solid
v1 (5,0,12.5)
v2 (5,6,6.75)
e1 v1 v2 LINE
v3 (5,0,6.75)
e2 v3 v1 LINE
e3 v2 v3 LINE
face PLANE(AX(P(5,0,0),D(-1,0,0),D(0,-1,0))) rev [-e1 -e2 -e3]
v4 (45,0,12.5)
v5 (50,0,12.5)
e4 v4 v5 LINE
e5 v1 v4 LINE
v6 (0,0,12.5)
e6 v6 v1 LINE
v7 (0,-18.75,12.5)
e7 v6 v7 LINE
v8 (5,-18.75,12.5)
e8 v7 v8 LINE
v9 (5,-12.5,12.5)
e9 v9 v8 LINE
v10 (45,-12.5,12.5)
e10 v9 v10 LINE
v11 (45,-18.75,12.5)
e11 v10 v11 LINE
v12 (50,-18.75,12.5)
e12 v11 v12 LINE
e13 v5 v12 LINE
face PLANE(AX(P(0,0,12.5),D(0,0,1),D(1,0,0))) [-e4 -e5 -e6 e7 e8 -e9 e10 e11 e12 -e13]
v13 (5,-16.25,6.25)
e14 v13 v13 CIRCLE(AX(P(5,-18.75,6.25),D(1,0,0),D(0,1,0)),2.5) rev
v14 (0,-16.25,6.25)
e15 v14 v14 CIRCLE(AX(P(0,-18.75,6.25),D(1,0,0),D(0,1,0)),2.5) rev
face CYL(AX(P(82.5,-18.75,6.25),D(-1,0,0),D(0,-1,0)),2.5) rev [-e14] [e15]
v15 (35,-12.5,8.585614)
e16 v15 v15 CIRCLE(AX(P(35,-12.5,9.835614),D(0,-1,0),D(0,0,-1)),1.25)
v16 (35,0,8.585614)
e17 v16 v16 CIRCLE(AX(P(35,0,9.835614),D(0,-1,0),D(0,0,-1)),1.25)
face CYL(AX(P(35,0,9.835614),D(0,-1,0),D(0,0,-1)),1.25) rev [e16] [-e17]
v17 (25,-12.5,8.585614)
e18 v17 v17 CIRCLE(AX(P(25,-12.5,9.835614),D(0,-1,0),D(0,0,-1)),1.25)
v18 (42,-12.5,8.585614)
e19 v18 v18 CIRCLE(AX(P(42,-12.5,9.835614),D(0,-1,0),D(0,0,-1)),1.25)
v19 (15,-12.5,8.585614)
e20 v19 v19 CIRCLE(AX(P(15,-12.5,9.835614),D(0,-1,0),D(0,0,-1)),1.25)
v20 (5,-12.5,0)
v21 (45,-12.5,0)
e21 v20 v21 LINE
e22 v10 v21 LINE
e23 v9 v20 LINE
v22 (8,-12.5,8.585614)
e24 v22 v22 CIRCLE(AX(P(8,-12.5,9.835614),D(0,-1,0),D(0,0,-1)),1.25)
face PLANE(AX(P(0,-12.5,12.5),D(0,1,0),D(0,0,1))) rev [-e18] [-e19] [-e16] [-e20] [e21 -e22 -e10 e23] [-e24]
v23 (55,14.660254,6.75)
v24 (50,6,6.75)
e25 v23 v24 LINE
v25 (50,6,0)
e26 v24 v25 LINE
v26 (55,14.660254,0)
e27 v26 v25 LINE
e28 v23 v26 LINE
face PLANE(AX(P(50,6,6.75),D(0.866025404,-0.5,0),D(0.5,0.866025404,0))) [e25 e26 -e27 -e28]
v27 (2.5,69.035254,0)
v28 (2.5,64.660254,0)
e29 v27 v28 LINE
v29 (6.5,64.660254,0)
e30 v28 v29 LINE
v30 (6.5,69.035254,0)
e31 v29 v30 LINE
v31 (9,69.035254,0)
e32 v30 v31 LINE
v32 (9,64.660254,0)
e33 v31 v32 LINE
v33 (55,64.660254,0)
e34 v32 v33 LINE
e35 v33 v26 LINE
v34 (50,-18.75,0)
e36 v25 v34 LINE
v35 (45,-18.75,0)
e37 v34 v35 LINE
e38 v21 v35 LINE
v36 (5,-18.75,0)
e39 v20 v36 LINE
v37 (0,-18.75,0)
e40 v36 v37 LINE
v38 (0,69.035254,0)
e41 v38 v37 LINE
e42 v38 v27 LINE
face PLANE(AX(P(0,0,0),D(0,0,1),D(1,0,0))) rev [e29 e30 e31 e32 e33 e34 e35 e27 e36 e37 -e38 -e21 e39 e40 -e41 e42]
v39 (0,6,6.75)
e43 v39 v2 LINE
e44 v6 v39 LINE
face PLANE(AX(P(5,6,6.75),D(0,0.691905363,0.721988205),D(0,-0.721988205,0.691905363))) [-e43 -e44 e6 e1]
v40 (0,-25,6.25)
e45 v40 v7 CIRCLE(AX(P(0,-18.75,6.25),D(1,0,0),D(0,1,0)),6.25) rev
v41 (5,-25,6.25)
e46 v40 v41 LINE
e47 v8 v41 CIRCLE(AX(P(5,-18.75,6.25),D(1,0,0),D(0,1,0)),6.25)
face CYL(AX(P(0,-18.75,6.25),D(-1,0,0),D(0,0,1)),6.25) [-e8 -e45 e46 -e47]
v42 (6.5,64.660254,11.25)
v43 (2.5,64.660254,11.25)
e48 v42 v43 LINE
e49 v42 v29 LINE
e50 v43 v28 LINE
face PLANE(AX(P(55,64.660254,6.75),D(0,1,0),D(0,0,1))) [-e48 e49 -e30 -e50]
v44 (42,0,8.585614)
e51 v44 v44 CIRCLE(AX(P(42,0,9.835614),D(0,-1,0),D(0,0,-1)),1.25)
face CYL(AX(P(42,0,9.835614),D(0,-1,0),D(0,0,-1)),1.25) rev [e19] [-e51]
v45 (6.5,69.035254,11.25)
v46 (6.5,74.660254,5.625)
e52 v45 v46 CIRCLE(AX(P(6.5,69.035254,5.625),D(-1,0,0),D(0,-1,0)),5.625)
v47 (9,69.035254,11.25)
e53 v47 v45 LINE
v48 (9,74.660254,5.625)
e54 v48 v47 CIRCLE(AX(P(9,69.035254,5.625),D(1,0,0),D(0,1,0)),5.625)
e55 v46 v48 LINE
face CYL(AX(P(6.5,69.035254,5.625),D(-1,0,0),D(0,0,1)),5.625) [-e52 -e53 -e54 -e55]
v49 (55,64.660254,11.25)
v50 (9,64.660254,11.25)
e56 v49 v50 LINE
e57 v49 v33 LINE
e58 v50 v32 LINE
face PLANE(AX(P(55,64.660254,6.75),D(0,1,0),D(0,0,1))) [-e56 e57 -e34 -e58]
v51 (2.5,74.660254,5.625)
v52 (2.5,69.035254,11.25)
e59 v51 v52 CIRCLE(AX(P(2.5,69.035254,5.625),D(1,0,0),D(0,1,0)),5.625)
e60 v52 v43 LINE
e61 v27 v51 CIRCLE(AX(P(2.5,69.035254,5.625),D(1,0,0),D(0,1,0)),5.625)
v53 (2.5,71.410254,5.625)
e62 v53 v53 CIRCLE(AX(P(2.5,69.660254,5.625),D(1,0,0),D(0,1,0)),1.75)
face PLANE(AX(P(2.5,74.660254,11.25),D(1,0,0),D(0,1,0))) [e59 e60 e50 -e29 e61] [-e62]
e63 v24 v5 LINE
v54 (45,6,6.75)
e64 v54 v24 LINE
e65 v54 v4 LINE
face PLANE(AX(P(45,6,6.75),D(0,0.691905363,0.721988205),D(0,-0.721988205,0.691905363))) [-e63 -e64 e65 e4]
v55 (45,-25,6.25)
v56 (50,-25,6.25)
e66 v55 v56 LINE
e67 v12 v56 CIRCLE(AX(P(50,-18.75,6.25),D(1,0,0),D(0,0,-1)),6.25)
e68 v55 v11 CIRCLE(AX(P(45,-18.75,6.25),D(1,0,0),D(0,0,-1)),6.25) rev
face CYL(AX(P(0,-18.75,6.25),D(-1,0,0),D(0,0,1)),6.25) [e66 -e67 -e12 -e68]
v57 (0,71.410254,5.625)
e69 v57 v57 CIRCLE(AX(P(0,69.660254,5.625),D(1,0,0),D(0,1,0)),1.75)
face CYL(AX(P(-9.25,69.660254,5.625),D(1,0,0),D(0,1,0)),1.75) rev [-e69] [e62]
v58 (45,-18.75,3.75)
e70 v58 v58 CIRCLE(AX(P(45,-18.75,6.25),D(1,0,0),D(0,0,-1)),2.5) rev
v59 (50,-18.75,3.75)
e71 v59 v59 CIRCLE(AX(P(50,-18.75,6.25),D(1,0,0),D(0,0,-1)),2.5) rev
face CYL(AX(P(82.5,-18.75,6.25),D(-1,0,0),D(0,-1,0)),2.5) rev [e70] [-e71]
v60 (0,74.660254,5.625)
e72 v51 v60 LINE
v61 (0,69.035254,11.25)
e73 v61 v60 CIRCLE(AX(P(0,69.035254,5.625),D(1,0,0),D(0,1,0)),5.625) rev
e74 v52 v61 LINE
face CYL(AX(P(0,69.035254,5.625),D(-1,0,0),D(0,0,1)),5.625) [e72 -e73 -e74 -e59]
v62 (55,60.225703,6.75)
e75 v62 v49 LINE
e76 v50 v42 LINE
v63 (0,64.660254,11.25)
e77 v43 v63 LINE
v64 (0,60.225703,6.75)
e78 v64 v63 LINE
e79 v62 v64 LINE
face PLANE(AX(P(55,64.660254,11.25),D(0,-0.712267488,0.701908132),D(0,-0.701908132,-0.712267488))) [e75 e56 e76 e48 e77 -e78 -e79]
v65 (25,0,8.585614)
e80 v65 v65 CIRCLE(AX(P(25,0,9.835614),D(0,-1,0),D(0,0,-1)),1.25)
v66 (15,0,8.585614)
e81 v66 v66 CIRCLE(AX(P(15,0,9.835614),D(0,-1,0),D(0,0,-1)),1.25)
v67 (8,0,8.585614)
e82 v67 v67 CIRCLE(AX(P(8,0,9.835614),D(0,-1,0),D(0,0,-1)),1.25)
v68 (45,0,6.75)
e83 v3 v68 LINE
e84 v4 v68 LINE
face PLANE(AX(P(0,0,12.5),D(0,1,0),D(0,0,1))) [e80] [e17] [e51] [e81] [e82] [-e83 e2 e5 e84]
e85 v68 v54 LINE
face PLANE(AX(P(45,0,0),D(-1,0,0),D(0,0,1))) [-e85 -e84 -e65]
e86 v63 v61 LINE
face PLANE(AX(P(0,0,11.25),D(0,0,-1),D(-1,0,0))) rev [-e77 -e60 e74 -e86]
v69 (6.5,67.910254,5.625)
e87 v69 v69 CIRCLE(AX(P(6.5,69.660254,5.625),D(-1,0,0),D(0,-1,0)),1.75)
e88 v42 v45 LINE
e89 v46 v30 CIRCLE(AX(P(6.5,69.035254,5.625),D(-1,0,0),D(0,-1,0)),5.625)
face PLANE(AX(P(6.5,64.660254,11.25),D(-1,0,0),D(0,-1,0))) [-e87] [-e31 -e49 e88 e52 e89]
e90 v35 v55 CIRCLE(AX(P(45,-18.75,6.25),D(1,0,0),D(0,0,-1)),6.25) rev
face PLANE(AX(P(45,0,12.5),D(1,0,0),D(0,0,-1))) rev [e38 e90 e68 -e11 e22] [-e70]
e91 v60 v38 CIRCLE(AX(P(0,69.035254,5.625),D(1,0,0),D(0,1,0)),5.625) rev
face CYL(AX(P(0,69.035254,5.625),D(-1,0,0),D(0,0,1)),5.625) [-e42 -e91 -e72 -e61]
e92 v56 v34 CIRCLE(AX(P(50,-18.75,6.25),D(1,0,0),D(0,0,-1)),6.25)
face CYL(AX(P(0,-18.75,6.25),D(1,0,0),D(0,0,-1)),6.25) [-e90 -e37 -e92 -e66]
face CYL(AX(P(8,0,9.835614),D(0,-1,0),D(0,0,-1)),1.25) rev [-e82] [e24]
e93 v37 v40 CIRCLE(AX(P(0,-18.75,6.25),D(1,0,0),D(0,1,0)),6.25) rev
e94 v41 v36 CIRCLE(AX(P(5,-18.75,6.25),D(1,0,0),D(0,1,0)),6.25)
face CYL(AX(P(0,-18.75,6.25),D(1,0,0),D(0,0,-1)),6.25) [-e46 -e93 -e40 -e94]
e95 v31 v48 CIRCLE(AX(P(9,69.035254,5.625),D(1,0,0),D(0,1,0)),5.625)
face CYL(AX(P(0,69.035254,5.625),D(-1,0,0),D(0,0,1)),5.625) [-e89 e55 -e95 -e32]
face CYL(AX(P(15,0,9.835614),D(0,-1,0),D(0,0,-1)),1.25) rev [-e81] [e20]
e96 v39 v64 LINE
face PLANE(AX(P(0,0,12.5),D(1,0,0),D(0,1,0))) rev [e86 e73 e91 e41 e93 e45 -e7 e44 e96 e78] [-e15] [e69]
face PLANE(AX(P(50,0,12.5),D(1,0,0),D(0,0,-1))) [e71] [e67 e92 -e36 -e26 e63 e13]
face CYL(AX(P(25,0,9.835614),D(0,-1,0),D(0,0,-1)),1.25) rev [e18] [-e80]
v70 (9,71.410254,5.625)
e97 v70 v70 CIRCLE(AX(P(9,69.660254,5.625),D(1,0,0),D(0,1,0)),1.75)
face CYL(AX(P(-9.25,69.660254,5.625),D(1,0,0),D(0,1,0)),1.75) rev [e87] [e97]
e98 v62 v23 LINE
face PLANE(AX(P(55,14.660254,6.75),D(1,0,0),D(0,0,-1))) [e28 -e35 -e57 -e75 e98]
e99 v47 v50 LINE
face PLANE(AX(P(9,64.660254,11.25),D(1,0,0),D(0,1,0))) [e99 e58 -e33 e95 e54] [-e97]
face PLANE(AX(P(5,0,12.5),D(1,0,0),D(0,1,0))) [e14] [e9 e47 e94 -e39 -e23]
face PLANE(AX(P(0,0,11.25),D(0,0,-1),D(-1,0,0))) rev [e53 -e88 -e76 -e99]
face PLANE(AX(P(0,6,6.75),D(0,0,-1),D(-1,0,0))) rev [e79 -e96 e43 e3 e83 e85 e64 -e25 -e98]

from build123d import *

# Parameters (mm, degrees)
SKETCH1_W               = 50
SKETCH1_H               = 12.5
SKETCH1_W_2             = 5
BOSS_EXTRUDE1_DEPTH     = 12.5
FILLET1_R               = 6.25
CUT_EXTRUDE1_DEPTH      = 77.5
CUT_EXTRUDE1_DEPTH_BACK = 24.5
SKETCH2_R               = 2.5
SKETCH4_R               = 1.25
CUT_EXTRUDE2_DEPTH      = 12.5
BOSS_EXTRUDE4_DEPTH     = 6
BOSS_EXTRUDE5_DEPTH     = 5
BOSS_EXTRUDE6_DEPTH     = 5
BOSS_EXTRUDE8_DEPTH     = 6.75
BOSS_EXTRUDE10_DEPTH    = 55
SKETCH12_W              = 2.5
SKETCH12_H              = 10
BOSS_EXTRUDE11_DEPTH    = 11.25
SKETCH14_W              = 2.5
SKETCH14_H              = 10
BOSS_EXTRUDE12_DEPTH    = 11.25
FILLET2_R               = 5.625
SKETCH16_R              = 1.75
CUT_EXTRUDE3_DEPTH      = 18.25


with BuildPart() as part:
    # Sketch1 → Boss-Extrude1 (new body)
    with BuildSketch(Plane.XY):
        with Locations((25, -6.25)):
            Rectangle(SKETCH1_W, SKETCH1_H)
        with Locations((2.5, -18.75)):
            Rectangle(SKETCH1_W_2, SKETCH1_H)
        with Locations((47.5, -18.75)):
            Rectangle(SKETCH1_W_2, SKETCH1_H)
    extrude(amount=BOSS_EXTRUDE1_DEPTH)

    # Fillet1
    fillet1_edges = [part.edges().sort_by_distance(p)[0] for p in [
        (2.5, -25, 12.5),
        (2.5, -25, 0),
        (47.5, -25, 12.5),
        (47.5, -25, 0),
    ]]
    fillet(fillet1_edges, radius=FILLET1_R - 0.0001)  # a hair under: the kernel refuses the full size

    # Sketch2 → Cut-Extrude1 (cut, two sides: drawn at the far end of the back side and taken through both)
    with BuildSketch(Plane(origin=(5, 0, 0), x_dir=(0, 0, -1), z_dir=(1, 0, 0)).offset(-CUT_EXTRUDE1_DEPTH_BACK)):
        with Locations((-6.25, -18.75)):
            Circle(SKETCH2_R)
    extrude(amount=CUT_EXTRUDE1_DEPTH + CUT_EXTRUDE1_DEPTH_BACK, mode=Mode.SUBTRACT)

    # Sketch4 → Cut-Extrude2 (cut)
    with BuildSketch(Plane(origin=(0, -12.5, 0), x_dir=(-1, 0, 0), z_dir=(0, -1, 0))):
        with Locations(Location((-8, -9.835613506, 0), (0, 0, 90))):
            Circle(SKETCH4_R)
        with Locations(Location((-15, -9.835613506, 0), (0, 0, 90))):
            Circle(SKETCH4_R)
        with Locations(Location((-25, -9.835613506, 0), (0, 0, 90))):
            Circle(SKETCH4_R)
        with Locations(Location((-35, -9.835613506, 0), (0, 0, 90))):
            Circle(SKETCH4_R)
        with Locations(Location((-42, -9.835613506, 0), (0, 0, 90))):
            Circle(SKETCH4_R)
    extrude(amount=-CUT_EXTRUDE2_DEPTH, mode=Mode.SUBTRACT)

    # Sketch5 → Boss-Extrude4 (add)
    with BuildSketch(Plane(origin=(0, 0, 0), x_dir=(1, 0, 0), z_dir=(0, 1, 0))):
        Polygon((50, 0), (0, 0), (0, -6.75), (5.75, -6.75), (44.25, -6.75), (50, -6.75), align=None)
    extrude(amount=BOSS_EXTRUDE4_DEPTH)

    # Sketch6 → Boss-Extrude5 (add)
    with BuildSketch(Plane.ZY):
        Polygon((6.75, 6), (12.5, 0), (6.75, 0), align=None)
    extrude(amount=-BOSS_EXTRUDE5_DEPTH)

    # Sketch7 → Boss-Extrude6 (add)
    with BuildSketch(Plane(origin=(50, 0, 0), x_dir=(0, 0, -1), z_dir=(1, 0, 0))):
        Polygon((-6.75, 6), (-12.5, 0), (-6.75, 0), align=None)
    extrude(amount=-BOSS_EXTRUDE6_DEPTH)

    # Sketch8 → Boss-Extrude8 (add)
    with BuildSketch(Plane(origin=(0, 0, 0), x_dir=(-1, 0, 0), z_dir=(0, 0, -1))):
        Polygon((-50, 6), (-55, 14.660254038), (-55, 64.660254038), (0, 64.660254038), (0, 6), align=None)
    extrude(amount=-BOSS_EXTRUDE8_DEPTH)

    # Sketch10 → Boss-Extrude10 (add)
    with BuildSketch(Plane.ZY):
        Polygon((6.75, 64.660254038), (11.25, 64.660254038), (6.75, 60.225702909), align=None)
    extrude(amount=-BOSS_EXTRUDE10_DEPTH)

    # Sketch12 → Boss-Extrude11 (add)
    with BuildSketch(Plane(origin=(0, 0, 0), x_dir=(-1, 0, 0), z_dir=(0, 0, -1))):
        with Locations((-1.25, 69.660254038)):
            Rectangle(SKETCH12_W, SKETCH12_H)
    extrude(amount=-BOSS_EXTRUDE11_DEPTH)

    # Sketch14 → Boss-Extrude12 (add)
    with BuildSketch(Plane(origin=(0, 0, 0), x_dir=(-1, 0, 0), z_dir=(0, 0, -1))):
        with Locations((-7.75, 69.660254038)):
            Rectangle(SKETCH14_W, SKETCH14_H)
    extrude(amount=-BOSS_EXTRUDE12_DEPTH)

    # Fillet2
    fillet2_edges = [part.edges().sort_by_distance(p)[0] for p in [
        (7.75, 74.660254038, 0),
        (7.75, 74.660254038, 11.25),
        (1.25, 74.660254038, 11.25),
        (1.25, 74.660254038, 0),
    ]]
    fillet(fillet2_edges, radius=FILLET2_R - 0.0001)  # a hair under: the kernel refuses the full size

    # Sketch16 → Cut-Extrude3 (cut)
    with BuildSketch(Plane(origin=(9, 0, 0), x_dir=(0, 0, -1), z_dir=(1, 0, 0))):
        with Locations(Location((-5.625, 69.660254038, 0), (0, 0, 90))):
            Circle(SKETCH16_R)
    extrude(amount=-CUT_EXTRUDE3_DEPTH, mode=Mode.SUBTRACT)


solid = part.part
